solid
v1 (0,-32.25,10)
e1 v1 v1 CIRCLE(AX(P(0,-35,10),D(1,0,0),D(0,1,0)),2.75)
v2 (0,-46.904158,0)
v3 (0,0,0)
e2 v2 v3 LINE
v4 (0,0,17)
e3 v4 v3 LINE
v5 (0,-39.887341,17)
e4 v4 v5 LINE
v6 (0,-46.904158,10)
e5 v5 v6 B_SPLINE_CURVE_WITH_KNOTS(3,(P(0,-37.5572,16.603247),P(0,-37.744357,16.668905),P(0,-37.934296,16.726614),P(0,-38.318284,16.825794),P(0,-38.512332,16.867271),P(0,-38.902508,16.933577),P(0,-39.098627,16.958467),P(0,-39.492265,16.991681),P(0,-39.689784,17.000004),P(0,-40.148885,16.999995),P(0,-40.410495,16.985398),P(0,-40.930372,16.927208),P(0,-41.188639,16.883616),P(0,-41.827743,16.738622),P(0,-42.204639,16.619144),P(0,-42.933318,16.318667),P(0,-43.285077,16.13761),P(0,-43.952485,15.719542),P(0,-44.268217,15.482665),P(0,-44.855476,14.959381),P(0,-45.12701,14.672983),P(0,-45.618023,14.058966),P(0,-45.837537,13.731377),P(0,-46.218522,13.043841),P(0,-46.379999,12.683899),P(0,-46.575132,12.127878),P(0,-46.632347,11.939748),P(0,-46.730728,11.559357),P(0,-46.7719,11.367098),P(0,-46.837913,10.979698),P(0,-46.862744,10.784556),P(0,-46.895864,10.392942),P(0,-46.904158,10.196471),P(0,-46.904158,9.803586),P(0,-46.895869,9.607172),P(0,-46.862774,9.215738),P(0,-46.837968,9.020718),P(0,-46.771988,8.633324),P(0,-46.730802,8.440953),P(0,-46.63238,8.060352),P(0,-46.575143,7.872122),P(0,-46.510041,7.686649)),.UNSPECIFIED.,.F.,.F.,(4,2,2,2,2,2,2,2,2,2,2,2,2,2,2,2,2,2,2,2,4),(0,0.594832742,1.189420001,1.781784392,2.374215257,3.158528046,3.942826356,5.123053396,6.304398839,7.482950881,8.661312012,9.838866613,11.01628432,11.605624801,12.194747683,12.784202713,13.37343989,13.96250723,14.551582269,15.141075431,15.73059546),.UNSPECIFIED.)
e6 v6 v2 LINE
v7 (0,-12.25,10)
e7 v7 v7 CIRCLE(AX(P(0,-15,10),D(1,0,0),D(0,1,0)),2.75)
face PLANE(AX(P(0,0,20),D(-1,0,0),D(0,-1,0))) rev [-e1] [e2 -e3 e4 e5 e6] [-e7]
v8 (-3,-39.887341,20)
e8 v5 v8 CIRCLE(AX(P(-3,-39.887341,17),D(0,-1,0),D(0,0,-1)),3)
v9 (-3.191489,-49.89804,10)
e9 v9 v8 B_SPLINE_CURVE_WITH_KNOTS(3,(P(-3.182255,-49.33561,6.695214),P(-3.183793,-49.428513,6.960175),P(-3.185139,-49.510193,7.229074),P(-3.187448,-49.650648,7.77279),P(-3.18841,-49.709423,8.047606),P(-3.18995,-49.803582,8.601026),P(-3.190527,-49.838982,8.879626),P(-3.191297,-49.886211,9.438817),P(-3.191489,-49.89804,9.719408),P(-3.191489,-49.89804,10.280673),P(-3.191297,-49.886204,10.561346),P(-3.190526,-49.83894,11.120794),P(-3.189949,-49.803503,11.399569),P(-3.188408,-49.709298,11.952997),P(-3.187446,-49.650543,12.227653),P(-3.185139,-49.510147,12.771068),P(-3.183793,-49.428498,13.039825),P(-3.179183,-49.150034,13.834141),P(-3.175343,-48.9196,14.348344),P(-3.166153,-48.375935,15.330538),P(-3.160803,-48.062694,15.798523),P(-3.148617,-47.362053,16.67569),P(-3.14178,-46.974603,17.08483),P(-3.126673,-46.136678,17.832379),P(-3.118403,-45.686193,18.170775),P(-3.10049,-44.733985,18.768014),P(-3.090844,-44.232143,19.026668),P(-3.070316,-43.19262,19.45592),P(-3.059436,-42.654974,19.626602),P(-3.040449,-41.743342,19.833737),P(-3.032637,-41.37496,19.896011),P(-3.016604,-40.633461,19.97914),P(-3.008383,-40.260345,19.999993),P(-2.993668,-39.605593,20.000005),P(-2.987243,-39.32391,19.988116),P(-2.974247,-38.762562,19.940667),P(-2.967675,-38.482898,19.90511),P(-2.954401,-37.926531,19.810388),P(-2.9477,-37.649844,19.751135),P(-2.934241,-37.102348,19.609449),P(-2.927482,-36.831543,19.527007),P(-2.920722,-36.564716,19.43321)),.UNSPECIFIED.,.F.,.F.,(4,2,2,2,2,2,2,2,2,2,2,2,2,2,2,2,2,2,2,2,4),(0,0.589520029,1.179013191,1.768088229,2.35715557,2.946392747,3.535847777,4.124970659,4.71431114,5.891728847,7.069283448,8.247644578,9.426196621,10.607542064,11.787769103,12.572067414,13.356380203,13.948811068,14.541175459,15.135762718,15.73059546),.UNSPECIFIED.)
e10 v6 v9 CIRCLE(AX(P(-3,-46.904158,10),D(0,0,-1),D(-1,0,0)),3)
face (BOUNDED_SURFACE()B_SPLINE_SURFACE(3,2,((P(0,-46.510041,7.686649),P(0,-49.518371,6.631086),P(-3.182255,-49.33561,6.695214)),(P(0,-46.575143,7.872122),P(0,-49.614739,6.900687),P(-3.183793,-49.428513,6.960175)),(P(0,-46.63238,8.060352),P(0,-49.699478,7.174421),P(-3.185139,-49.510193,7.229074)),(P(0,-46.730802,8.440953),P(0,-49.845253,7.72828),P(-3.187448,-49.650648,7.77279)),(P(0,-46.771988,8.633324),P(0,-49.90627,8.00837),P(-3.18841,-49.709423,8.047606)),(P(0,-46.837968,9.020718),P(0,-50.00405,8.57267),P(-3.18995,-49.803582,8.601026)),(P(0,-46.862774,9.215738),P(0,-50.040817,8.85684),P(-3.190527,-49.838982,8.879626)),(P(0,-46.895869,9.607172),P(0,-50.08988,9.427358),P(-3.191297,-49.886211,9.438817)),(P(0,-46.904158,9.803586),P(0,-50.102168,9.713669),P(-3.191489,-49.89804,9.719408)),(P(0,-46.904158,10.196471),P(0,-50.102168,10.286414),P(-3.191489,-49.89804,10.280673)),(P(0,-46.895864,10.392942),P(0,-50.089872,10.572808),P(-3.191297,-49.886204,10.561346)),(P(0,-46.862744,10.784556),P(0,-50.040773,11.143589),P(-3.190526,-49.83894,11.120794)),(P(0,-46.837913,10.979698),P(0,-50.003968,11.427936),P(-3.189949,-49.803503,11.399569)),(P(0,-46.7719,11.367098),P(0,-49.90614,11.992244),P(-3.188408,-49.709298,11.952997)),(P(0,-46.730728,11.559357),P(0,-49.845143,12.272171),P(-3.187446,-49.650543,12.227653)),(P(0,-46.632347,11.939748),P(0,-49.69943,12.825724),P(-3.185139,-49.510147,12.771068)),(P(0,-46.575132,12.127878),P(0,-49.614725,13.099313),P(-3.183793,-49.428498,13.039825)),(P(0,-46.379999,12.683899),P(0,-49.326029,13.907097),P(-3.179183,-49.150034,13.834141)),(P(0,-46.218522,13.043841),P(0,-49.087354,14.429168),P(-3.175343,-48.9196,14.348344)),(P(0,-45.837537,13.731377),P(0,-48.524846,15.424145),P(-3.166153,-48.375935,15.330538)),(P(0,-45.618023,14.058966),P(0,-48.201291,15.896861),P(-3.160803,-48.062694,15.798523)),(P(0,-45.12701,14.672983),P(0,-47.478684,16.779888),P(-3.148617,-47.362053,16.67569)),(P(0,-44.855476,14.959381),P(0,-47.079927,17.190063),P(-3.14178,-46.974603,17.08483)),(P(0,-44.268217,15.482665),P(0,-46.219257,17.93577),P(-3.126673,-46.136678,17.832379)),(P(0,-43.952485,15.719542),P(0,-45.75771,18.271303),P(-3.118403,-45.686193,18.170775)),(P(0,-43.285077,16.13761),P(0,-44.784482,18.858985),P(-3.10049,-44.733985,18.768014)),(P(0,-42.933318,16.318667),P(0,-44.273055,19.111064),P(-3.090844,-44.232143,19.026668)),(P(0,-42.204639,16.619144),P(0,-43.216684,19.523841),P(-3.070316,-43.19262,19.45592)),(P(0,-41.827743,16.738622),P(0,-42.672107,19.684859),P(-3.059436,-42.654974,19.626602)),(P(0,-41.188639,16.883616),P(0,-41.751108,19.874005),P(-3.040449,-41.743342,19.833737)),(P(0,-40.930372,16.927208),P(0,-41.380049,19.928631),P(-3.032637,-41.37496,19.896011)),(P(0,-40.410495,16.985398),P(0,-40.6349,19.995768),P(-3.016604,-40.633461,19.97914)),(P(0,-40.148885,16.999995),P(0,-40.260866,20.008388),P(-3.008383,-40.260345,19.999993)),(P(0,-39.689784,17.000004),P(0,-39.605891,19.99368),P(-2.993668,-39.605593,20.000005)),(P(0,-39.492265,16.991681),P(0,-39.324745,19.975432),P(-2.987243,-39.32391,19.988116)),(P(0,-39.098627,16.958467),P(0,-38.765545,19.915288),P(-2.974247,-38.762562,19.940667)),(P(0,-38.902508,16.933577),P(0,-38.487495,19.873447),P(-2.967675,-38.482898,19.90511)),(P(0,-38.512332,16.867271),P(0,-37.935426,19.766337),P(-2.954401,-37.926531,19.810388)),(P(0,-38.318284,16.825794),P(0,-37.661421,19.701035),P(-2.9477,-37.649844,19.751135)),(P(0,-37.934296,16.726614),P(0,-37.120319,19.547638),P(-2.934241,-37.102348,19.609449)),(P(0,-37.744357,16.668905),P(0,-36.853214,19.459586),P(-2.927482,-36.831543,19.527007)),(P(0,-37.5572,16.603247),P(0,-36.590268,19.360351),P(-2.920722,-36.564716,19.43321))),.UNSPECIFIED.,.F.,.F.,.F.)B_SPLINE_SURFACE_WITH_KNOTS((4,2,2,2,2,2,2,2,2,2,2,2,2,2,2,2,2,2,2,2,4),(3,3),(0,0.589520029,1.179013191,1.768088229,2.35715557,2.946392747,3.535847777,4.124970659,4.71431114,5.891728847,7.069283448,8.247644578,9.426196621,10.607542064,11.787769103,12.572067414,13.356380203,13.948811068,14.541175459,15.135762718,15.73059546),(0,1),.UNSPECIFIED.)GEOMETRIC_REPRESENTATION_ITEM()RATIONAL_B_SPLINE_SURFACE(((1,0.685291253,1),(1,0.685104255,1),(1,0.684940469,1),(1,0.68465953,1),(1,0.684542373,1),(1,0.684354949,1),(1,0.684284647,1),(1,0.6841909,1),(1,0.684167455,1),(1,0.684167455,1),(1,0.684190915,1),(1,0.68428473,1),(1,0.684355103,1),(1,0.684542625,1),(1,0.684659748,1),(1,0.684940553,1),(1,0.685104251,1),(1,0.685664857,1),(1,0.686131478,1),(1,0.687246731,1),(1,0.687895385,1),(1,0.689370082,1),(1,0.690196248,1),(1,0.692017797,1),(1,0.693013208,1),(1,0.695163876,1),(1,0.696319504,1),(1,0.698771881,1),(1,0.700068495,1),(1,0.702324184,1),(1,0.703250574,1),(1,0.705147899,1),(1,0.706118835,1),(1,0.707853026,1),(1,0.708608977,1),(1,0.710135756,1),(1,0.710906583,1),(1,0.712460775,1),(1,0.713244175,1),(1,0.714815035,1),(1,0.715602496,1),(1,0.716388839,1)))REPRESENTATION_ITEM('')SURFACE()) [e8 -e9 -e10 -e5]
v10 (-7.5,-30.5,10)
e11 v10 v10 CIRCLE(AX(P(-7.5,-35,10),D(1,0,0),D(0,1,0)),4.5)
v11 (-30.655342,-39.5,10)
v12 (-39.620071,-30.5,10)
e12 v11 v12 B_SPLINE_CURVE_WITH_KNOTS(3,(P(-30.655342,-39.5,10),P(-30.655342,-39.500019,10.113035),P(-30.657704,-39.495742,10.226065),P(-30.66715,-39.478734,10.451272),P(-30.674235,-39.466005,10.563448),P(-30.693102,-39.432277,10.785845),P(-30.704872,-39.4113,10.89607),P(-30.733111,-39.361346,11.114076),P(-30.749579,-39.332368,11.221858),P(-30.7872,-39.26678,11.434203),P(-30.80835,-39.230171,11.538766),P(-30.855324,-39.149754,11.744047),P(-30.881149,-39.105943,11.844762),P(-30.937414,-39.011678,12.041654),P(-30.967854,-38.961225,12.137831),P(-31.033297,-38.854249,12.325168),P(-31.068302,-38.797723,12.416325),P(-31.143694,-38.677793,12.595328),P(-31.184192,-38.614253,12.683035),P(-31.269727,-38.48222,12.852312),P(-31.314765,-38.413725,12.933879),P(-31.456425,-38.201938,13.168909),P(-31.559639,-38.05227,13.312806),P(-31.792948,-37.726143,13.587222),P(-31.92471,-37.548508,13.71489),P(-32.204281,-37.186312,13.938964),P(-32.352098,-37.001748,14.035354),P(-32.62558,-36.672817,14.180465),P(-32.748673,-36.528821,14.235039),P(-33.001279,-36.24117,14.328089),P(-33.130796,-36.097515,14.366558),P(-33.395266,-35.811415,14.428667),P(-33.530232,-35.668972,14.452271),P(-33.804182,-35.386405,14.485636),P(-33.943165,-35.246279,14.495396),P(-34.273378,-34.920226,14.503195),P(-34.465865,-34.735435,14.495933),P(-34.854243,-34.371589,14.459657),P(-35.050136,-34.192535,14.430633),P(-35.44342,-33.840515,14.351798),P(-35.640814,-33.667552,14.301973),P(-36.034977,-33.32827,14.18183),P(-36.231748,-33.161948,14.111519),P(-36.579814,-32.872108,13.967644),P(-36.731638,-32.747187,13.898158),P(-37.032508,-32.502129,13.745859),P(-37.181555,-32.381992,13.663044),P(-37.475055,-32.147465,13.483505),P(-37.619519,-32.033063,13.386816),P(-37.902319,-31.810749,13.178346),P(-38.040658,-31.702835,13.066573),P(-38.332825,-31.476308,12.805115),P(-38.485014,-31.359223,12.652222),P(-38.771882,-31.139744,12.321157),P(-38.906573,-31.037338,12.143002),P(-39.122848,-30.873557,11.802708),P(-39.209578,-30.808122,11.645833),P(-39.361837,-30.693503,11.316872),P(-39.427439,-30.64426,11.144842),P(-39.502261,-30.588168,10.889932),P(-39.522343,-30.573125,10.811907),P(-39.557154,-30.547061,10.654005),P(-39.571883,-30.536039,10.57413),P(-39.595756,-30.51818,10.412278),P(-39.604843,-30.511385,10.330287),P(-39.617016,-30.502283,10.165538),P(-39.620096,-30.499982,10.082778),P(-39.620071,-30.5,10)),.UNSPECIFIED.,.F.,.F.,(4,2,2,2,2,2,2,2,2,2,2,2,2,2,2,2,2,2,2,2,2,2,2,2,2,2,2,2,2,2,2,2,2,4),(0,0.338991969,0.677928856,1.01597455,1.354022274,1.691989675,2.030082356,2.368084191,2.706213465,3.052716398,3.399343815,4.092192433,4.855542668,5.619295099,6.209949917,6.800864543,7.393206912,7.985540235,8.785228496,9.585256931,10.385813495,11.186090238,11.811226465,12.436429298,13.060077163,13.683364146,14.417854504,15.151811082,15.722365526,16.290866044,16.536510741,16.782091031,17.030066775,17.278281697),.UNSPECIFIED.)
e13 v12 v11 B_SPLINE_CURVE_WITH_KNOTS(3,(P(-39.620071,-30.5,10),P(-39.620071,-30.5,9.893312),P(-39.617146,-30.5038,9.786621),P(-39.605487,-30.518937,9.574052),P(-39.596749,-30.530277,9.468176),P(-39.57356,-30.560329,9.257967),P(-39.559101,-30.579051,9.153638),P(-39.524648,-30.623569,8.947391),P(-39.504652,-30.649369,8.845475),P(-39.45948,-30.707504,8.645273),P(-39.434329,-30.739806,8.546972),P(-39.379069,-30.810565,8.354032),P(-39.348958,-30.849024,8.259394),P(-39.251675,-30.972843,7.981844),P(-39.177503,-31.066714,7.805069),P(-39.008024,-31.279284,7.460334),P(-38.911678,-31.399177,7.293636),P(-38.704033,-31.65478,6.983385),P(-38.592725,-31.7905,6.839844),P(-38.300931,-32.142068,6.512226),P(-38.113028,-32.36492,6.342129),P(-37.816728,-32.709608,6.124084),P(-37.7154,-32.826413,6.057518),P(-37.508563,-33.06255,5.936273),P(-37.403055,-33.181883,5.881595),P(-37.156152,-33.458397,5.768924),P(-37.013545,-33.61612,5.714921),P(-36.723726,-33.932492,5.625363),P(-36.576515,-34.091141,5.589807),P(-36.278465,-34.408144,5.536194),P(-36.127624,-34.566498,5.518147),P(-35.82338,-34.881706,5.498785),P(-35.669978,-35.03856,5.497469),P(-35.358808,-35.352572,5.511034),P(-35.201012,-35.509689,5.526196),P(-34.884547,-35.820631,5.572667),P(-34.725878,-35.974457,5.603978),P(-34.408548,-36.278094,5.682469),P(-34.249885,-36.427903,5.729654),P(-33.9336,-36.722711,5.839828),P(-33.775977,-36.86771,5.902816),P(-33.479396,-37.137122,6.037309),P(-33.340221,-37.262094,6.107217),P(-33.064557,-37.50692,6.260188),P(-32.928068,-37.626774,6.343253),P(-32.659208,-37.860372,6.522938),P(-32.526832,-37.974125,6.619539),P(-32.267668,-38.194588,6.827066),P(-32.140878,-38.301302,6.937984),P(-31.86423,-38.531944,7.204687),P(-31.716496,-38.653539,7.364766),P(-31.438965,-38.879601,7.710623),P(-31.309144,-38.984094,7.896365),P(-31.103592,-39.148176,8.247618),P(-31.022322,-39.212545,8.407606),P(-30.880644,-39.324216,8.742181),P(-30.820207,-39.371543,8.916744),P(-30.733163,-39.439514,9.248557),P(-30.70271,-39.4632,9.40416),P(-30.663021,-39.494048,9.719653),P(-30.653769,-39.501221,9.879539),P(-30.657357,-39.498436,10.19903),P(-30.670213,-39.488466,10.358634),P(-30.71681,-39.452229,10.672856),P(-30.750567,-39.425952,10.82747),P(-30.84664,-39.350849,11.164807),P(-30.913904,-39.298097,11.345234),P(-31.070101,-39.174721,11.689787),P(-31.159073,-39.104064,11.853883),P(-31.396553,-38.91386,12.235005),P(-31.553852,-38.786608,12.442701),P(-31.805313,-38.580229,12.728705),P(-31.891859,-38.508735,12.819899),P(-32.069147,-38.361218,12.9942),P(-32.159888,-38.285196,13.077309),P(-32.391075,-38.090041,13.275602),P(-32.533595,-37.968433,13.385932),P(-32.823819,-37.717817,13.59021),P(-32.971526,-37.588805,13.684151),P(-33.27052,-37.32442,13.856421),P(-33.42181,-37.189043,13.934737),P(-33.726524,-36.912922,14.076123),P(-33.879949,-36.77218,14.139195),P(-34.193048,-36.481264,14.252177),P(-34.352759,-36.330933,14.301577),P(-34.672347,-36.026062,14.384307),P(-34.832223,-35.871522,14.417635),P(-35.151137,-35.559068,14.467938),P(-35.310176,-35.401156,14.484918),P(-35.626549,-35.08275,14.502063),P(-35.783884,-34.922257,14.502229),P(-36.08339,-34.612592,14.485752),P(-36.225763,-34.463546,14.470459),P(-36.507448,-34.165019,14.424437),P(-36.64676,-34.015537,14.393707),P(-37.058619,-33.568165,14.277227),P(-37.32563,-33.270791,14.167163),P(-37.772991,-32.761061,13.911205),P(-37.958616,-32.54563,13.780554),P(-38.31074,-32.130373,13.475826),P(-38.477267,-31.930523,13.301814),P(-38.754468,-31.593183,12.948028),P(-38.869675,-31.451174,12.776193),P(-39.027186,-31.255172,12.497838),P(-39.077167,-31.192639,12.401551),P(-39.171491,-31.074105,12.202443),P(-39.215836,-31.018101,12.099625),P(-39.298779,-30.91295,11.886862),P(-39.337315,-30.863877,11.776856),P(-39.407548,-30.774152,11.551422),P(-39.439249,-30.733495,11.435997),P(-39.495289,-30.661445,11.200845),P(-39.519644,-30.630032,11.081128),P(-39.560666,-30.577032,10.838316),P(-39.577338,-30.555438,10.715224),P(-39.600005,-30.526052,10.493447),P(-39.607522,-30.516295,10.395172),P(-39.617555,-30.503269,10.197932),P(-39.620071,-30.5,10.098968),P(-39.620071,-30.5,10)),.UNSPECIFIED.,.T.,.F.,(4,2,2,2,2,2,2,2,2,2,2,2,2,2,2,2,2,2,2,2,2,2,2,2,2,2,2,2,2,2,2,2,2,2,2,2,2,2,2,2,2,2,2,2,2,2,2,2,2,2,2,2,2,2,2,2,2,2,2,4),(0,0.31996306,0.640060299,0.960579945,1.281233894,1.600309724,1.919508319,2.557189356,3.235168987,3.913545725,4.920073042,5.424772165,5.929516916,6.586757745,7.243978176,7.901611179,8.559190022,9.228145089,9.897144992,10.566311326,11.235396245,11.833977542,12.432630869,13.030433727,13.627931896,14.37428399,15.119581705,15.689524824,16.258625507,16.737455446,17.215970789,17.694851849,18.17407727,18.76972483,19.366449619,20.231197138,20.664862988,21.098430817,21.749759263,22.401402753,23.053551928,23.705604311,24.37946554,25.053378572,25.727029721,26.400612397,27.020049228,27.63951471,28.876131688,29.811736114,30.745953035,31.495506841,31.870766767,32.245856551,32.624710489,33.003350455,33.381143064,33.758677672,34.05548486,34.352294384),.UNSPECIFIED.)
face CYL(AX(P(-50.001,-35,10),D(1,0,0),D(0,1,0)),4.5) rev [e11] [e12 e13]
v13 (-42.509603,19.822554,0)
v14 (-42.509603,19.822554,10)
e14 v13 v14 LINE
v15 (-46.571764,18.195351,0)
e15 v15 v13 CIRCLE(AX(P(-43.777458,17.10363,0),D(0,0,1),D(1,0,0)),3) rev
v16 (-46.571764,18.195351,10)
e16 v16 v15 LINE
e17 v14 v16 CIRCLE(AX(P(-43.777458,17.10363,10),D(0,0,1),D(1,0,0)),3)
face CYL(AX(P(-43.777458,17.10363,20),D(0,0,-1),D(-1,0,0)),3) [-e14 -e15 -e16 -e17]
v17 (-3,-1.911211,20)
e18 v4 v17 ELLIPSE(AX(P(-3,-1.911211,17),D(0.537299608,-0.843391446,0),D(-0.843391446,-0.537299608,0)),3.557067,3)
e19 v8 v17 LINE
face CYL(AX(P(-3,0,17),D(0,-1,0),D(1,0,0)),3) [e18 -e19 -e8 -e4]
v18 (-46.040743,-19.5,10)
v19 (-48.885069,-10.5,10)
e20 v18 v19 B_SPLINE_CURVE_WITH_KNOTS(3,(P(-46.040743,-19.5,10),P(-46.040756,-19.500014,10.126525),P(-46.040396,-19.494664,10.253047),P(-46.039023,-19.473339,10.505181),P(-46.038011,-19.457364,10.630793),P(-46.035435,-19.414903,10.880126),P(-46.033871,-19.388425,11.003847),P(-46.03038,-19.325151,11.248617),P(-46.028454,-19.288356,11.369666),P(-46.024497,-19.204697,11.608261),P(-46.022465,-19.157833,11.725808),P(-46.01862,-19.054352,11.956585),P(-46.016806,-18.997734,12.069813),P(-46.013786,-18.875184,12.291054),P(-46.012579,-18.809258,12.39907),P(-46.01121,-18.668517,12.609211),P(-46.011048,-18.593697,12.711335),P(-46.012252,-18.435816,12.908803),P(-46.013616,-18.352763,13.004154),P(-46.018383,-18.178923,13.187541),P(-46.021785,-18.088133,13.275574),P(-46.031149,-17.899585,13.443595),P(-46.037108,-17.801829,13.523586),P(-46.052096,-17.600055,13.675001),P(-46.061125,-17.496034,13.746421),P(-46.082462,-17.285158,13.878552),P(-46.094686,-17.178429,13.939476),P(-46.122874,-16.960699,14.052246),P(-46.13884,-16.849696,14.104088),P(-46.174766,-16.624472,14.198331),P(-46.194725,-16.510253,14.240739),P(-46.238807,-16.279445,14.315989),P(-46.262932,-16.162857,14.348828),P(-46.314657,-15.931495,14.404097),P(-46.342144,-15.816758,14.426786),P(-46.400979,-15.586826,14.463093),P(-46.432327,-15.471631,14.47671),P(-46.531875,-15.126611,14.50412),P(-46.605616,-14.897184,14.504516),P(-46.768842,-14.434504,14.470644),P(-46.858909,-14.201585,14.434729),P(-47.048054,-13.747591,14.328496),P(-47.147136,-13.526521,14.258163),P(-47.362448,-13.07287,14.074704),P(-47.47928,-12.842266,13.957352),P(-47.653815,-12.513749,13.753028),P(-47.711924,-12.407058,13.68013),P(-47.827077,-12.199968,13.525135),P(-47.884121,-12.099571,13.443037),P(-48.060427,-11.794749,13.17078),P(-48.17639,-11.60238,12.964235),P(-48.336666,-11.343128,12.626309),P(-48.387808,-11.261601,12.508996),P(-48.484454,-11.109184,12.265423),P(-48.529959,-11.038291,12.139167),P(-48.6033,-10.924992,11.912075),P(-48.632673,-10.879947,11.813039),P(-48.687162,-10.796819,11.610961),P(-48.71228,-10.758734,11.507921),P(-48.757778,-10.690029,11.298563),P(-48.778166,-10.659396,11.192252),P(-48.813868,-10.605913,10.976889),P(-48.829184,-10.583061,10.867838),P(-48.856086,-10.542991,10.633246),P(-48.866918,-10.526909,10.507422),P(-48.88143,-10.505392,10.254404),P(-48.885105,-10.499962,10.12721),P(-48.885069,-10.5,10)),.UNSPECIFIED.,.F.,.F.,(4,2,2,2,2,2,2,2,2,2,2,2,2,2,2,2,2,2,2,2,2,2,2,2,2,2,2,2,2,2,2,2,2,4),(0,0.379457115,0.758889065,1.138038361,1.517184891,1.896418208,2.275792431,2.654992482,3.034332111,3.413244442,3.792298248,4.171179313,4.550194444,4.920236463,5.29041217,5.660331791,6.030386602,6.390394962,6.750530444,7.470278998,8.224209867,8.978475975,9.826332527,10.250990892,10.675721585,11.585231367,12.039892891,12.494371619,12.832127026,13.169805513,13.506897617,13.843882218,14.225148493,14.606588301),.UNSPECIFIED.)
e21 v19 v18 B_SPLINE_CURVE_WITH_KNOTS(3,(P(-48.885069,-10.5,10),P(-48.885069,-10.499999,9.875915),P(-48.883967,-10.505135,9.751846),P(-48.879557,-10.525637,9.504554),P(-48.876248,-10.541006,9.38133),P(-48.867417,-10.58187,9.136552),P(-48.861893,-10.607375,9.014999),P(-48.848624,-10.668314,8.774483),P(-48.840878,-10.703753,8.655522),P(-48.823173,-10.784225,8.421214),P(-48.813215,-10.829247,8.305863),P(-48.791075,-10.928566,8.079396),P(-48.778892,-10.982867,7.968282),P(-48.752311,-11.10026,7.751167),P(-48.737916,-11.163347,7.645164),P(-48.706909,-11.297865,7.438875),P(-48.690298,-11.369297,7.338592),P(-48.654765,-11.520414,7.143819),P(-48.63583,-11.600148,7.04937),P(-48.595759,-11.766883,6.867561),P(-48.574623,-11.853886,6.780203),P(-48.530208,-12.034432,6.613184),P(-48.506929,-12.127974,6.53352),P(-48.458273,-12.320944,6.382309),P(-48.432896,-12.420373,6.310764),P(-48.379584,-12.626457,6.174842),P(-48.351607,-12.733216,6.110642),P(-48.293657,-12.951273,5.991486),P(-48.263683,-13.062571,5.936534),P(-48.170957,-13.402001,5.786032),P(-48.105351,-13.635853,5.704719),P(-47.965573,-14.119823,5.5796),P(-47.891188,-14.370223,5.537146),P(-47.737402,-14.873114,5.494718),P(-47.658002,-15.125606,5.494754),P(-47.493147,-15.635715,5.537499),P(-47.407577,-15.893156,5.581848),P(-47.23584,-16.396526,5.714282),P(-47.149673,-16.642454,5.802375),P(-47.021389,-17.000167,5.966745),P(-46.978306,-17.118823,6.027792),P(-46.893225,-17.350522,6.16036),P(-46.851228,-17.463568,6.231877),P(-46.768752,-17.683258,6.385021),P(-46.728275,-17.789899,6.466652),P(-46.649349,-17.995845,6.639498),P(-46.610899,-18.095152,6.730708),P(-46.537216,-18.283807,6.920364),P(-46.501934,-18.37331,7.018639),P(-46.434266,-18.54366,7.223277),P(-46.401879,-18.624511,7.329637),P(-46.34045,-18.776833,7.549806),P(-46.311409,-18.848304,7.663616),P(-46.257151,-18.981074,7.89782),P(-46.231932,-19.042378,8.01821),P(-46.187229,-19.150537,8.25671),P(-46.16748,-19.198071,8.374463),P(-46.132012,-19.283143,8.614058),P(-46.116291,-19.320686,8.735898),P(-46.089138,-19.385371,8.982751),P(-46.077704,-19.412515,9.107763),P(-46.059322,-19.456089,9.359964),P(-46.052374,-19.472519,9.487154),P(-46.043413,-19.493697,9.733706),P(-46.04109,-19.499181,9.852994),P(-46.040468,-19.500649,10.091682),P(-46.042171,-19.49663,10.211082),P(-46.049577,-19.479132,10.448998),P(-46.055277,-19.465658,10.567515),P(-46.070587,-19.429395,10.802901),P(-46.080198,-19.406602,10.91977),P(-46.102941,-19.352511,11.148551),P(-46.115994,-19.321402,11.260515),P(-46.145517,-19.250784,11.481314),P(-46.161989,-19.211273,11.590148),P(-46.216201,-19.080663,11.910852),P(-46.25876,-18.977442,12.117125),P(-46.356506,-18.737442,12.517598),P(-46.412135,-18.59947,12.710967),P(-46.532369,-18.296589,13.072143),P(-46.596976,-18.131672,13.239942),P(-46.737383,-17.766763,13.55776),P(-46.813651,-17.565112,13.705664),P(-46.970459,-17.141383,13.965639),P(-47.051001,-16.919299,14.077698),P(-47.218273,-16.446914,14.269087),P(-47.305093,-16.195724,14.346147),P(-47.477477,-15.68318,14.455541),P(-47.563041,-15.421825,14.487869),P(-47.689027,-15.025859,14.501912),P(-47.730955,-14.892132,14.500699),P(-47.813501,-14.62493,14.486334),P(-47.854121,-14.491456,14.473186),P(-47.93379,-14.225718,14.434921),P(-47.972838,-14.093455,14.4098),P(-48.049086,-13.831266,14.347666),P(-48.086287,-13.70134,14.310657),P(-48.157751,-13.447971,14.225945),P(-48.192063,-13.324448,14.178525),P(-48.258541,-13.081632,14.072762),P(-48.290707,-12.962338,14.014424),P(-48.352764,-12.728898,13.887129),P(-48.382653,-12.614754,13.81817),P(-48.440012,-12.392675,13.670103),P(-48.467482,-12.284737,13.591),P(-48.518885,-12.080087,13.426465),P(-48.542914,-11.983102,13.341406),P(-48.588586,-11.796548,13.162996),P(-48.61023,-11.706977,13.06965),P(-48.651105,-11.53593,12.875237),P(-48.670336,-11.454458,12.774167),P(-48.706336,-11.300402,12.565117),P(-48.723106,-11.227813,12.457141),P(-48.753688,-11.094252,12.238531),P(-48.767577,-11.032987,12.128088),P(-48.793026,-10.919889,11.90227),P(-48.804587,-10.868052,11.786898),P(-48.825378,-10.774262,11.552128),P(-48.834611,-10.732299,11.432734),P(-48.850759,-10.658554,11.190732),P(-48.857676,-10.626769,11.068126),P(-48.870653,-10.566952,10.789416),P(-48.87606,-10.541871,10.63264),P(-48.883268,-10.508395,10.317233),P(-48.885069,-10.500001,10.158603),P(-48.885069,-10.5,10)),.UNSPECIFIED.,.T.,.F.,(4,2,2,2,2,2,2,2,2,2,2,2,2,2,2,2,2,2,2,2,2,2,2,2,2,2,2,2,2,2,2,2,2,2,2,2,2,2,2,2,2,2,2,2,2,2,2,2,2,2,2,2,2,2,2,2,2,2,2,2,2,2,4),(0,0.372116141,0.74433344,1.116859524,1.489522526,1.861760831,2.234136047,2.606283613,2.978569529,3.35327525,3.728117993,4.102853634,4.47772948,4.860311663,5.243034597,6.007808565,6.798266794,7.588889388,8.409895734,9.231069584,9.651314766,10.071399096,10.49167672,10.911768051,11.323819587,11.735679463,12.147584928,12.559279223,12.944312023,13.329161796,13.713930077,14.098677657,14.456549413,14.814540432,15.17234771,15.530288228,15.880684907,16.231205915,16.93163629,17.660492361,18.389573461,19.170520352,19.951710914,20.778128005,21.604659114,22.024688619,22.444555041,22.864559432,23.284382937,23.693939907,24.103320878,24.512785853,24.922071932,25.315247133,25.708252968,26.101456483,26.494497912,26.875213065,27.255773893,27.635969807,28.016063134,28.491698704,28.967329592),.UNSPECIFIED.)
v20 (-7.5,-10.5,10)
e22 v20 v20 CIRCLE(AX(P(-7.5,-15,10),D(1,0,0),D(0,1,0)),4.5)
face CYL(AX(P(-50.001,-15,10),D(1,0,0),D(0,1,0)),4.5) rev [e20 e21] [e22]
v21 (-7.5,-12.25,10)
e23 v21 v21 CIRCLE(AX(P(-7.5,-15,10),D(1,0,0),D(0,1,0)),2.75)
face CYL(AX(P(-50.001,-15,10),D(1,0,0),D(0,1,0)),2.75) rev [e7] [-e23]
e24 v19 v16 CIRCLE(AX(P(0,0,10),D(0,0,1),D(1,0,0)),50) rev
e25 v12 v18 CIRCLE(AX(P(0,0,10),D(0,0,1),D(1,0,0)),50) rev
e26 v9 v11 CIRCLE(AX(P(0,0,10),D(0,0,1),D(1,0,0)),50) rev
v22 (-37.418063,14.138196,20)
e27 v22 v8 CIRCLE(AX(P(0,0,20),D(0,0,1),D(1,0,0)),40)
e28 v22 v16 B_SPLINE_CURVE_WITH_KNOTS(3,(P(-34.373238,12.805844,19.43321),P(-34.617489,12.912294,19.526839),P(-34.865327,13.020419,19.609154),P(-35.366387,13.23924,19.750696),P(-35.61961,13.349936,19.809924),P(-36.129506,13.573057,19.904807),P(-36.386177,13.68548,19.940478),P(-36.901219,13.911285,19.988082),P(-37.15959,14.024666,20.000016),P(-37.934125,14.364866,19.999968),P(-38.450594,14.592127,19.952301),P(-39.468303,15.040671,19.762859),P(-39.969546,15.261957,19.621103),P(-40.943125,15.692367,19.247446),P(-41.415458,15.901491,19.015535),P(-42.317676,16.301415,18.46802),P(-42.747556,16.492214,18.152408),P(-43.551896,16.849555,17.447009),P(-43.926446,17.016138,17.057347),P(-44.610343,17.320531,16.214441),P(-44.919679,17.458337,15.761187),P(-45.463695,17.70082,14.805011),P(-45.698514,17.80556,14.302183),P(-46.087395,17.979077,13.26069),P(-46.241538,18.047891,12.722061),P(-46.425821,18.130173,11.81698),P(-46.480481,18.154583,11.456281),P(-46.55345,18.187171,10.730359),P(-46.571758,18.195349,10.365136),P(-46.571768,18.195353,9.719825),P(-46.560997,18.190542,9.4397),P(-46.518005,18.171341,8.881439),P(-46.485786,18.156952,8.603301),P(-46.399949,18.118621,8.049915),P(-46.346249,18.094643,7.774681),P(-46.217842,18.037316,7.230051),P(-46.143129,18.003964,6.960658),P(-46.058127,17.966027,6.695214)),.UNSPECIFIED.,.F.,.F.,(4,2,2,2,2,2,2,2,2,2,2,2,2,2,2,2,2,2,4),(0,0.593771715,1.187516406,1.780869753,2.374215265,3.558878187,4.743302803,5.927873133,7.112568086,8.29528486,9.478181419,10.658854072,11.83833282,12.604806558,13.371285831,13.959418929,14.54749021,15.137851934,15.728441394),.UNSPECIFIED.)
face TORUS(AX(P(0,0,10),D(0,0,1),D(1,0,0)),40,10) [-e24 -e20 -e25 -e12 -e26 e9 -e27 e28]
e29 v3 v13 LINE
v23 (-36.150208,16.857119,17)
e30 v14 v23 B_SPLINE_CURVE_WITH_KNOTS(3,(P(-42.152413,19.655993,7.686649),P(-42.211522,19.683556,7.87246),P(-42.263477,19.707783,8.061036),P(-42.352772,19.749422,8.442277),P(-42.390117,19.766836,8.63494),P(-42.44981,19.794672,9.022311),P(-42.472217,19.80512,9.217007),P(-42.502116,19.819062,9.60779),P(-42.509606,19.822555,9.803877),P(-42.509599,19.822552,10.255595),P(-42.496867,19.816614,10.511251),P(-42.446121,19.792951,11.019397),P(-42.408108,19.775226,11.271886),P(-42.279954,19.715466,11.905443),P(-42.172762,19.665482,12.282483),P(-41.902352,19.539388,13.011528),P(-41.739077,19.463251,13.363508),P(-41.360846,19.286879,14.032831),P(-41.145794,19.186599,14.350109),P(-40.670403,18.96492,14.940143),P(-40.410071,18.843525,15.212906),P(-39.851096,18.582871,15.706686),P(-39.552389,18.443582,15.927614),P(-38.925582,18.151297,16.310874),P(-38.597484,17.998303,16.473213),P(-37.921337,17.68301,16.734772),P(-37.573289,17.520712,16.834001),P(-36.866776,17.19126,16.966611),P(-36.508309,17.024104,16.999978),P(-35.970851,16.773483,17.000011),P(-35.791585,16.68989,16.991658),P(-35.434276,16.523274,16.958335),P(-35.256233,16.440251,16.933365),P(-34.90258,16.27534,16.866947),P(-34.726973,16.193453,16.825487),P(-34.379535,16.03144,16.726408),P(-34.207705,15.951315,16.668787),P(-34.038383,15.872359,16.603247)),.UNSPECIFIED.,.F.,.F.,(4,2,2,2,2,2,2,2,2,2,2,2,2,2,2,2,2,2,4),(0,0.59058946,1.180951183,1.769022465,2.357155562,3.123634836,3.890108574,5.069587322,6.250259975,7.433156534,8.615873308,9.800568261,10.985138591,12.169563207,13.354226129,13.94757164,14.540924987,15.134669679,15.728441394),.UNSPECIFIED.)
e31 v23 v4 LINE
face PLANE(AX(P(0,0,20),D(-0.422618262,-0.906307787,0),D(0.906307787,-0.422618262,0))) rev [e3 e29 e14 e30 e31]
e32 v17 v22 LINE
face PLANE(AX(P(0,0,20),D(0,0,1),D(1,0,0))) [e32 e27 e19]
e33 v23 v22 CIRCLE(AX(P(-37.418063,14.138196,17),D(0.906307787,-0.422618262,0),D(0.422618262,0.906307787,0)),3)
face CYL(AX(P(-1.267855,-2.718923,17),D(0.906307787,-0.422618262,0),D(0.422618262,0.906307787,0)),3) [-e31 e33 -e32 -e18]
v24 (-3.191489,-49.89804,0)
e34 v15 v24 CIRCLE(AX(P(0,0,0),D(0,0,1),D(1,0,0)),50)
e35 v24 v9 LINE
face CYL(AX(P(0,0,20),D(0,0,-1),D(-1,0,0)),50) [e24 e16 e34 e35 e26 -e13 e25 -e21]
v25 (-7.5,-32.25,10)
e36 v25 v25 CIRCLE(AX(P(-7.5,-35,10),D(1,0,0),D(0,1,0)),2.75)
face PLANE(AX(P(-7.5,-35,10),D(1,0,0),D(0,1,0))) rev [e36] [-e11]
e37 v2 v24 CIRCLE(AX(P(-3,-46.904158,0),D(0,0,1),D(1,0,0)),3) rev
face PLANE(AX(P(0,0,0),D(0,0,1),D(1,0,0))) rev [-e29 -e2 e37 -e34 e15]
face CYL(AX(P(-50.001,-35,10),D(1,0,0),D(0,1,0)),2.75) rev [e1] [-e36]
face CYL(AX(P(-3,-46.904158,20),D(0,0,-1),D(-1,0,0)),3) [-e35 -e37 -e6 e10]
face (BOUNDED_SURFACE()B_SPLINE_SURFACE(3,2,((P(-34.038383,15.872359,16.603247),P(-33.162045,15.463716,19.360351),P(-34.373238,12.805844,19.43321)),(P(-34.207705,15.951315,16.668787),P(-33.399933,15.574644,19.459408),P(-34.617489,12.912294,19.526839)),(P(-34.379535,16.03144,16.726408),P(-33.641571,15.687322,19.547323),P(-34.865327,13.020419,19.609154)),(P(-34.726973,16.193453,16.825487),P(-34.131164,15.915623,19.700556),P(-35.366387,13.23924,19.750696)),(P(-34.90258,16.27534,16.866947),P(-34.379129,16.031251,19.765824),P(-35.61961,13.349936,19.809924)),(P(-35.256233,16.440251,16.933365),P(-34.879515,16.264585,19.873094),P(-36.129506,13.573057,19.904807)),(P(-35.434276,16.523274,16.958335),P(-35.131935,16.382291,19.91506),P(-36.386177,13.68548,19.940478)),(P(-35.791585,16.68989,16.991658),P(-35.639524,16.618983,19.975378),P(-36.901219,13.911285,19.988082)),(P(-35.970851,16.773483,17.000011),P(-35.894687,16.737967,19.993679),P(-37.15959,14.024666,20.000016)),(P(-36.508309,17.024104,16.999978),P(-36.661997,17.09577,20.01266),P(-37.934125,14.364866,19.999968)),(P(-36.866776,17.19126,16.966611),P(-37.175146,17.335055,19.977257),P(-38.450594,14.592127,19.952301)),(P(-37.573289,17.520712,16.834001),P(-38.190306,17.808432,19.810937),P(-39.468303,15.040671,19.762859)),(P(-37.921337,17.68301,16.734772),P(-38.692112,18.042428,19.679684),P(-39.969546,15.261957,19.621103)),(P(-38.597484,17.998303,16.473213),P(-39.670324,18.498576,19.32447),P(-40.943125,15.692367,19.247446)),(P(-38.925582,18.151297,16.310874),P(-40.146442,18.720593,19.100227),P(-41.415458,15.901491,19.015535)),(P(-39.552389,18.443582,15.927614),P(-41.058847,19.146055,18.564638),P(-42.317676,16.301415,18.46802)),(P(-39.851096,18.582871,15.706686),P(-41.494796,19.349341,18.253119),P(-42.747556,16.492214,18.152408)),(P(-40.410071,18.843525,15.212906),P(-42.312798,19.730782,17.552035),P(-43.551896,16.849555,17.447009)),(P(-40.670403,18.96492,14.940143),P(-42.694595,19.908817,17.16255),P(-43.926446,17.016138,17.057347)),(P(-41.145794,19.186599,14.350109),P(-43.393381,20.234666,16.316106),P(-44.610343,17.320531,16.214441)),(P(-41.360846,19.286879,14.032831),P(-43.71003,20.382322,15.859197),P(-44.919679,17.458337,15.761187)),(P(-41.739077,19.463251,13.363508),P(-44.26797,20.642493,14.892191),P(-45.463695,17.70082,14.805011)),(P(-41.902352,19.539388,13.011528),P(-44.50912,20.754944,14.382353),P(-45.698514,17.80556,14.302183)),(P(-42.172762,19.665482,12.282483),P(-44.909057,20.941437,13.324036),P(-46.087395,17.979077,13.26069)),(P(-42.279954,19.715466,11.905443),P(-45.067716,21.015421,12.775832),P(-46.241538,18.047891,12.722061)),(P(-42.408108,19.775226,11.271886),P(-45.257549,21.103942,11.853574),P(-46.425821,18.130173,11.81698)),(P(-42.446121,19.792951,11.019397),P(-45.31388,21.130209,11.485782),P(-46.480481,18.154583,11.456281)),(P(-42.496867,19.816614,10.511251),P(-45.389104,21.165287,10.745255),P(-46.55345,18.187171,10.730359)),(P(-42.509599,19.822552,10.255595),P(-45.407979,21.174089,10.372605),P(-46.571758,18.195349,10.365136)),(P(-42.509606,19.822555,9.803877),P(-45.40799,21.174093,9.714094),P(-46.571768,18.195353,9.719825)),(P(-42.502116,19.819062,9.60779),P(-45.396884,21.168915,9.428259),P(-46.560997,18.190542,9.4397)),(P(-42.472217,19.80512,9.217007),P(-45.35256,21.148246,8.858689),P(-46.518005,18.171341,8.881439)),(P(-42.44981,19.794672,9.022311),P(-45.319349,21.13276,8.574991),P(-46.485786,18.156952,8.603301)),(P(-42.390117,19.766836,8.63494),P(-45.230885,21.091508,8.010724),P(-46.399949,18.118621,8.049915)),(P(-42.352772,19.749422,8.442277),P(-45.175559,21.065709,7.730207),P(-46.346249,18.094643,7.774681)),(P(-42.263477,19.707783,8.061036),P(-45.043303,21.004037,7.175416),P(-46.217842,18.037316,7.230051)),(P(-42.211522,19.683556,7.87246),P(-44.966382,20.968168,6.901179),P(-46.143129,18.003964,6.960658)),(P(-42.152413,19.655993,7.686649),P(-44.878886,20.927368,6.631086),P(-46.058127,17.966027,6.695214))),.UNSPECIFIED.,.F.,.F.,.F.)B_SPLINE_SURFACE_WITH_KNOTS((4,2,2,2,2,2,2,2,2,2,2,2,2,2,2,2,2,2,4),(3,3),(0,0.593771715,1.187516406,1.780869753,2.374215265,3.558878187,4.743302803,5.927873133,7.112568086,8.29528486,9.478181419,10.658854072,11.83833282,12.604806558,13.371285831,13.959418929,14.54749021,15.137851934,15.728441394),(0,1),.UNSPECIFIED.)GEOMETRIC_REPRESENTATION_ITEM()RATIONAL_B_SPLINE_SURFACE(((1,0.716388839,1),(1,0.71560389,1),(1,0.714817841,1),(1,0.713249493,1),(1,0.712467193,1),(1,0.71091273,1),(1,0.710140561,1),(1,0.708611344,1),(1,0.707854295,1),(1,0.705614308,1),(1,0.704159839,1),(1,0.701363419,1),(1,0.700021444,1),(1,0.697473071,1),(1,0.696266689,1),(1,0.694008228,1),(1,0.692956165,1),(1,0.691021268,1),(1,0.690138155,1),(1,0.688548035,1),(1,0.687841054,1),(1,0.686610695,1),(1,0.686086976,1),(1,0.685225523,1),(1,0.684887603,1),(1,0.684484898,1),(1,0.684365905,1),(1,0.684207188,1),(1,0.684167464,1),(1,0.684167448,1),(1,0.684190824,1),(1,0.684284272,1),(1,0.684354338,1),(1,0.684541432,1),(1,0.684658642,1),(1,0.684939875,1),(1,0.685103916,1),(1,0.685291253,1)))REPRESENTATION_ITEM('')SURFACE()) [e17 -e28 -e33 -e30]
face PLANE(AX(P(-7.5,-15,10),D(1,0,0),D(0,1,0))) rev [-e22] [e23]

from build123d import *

# Parameters (mm, degrees)
BOSS_EXTRUDE1_DEPTH     = 20
CUT_EXTRUDE1_REACH      = 75.485
CUT_EXTRUDE1_END_RADIUS = 50
SKETCH3_R               = 2.75
CUT_EXTRUDE2_REACH      = 70.602
CUT_EXTRUDE2_END_RADIUS = 50
SKETCH4_R               = 4.5
FILLET1_R               = 10
FILLET2_R               = 3


with BuildPart() as part:
    # Sketch2 → Boss-Extrude1 (new body)
    with BuildSketch(Plane.XY):
        with BuildLine():
            Line((0, 0), (-45.315389352, 21.130913087))
            ThreePointArc((-45.315389352, 21.130913087), (-42.169572291, -26.864980417), (0, -50))
            Line((0, -50), (0, 0))
        make_face()
    extrude(amount=BOSS_EXTRUDE1_DEPTH)

    # Cut-Extrude1: up to this cylinder (the profile starts inside it)
    cut_extrude1_end = Plane(origin=(0, 0, 10), z_dir=(0, 0, -1)) * Cylinder(CUT_EXTRUDE1_END_RADIUS, 251.97, mode=Mode.PRIVATE)
    # Sketch3 → Cut-Extrude1 (cut, up to the surface)
    with BuildSketch(Plane(origin=(0, 0, 0), x_dir=(0, 0, -1), z_dir=(1, 0, 0)), mode=Mode.PRIVATE) as cut_extrude1_sk1:
        with Locations(Location((-10, -35, 0), (0, 0, 90))):
            Circle(SKETCH3_R)
    cut_extrude1_tool1 = extrude(cut_extrude1_sk1.sketch, amount=-CUT_EXTRUDE1_REACH, mode=Mode.PRIVATE) & cut_extrude1_end
    add(cut_extrude1_tool1.solids().sort_by_distance((0, -35, 10))[0], mode=Mode.SUBTRACT)
    # Sketch3 → Cut-Extrude1 (cut, up to the surface)
    with BuildSketch(Plane(origin=(0, 0, 0), x_dir=(0, 0, -1), z_dir=(1, 0, 0)), mode=Mode.PRIVATE) as cut_extrude1_sk2:
        with Locations(Location((-10, -15, 0), (0, 0, 90))):
            Circle(SKETCH3_R)
    cut_extrude1_tool2 = extrude(cut_extrude1_sk2.sketch, amount=-CUT_EXTRUDE1_REACH, mode=Mode.PRIVATE) & cut_extrude1_end
    add(cut_extrude1_tool2.solids().sort_by_distance((0, -15, 10))[0], mode=Mode.SUBTRACT)

    # Cut-Extrude2: up to this cylinder (the profile starts inside it)
    cut_extrude2_end = Plane(origin=(0, 0, 10), z_dir=(0, 0, -1)) * Cylinder(CUT_EXTRUDE2_END_RADIUS, 242.204, mode=Mode.PRIVATE)
    # Sketch4 → Cut-Extrude2 (cut, up to the surface)
    with BuildSketch(Plane(origin=(-7.5, 0, 0), x_dir=(0, 0, -1), z_dir=(1, 0, 0)), mode=Mode.PRIVATE) as cut_extrude2_sk1:
        with Locations(Location((-10, -15, 0), (0, 0, 90))):
            Circle(SKETCH4_R)
    cut_extrude2_tool1 = extrude(cut_extrude2_sk1.sketch, amount=-CUT_EXTRUDE2_REACH, mode=Mode.PRIVATE) & cut_extrude2_end
    add(cut_extrude2_tool1.solids().sort_by_distance((-7.5, -15, 10))[0], mode=Mode.SUBTRACT)
    # Sketch4 → Cut-Extrude2 (cut, up to the surface)
    with BuildSketch(Plane(origin=(-7.5, 0, 0), x_dir=(0, 0, -1), z_dir=(1, 0, 0)), mode=Mode.PRIVATE) as cut_extrude2_sk2:
        with Locations(Location((-10, -35, 0), (0, 0, 90))):
            Circle(SKETCH4_R)
    cut_extrude2_tool2 = extrude(cut_extrude2_sk2.sketch, amount=-CUT_EXTRUDE2_REACH, mode=Mode.PRIVATE) & cut_extrude2_end
    add(cut_extrude2_tool2.solids().sort_by_distance((-7.5, -35, 10))[0], mode=Mode.SUBTRACT)

    # Fillet1
    # the kernel refuses this fillet: 10 mm, written as the material it takes off along each edge
    with BuildSketch(Plane(origin=(0, 0, 20), x_dir=(-0.5924817254083071, 0.8055838907632124, 0), z_dir=(0.8055838907632124, 0.5924817254083071, 0))) as fillet1_piece_1:
        with BuildLine():
            CenterArc((50 - FILLET1_R, -FILLET1_R), FILLET1_R, 0, 90)
            Line((50 - FILLET1_R, 0), (50, 0))
            Line((50, 0), (50, -FILLET1_R))
        make_face()
    revolve(axis=Axis((0, 0, 20), (0, 0, 1)), revolution_arc=172.333365089, mode=Mode.SUBTRACT)

    # Fillet2
    fillet2_edges = [part.edges().sort_by_distance(p)[0] for p in [
        (0, -20, 20),
        (0, -50, 5),
        (0, -47.071067812, 17.071067812),
        (-45.315389352, 21.130913087, 5),
        (-42.660875302, 19.893092857, 17.071067812),
        (-18.126155741, 8.452365235, 20),
    ]]
    fillet(fillet2_edges, radius=FILLET2_R)


solid = part.part
